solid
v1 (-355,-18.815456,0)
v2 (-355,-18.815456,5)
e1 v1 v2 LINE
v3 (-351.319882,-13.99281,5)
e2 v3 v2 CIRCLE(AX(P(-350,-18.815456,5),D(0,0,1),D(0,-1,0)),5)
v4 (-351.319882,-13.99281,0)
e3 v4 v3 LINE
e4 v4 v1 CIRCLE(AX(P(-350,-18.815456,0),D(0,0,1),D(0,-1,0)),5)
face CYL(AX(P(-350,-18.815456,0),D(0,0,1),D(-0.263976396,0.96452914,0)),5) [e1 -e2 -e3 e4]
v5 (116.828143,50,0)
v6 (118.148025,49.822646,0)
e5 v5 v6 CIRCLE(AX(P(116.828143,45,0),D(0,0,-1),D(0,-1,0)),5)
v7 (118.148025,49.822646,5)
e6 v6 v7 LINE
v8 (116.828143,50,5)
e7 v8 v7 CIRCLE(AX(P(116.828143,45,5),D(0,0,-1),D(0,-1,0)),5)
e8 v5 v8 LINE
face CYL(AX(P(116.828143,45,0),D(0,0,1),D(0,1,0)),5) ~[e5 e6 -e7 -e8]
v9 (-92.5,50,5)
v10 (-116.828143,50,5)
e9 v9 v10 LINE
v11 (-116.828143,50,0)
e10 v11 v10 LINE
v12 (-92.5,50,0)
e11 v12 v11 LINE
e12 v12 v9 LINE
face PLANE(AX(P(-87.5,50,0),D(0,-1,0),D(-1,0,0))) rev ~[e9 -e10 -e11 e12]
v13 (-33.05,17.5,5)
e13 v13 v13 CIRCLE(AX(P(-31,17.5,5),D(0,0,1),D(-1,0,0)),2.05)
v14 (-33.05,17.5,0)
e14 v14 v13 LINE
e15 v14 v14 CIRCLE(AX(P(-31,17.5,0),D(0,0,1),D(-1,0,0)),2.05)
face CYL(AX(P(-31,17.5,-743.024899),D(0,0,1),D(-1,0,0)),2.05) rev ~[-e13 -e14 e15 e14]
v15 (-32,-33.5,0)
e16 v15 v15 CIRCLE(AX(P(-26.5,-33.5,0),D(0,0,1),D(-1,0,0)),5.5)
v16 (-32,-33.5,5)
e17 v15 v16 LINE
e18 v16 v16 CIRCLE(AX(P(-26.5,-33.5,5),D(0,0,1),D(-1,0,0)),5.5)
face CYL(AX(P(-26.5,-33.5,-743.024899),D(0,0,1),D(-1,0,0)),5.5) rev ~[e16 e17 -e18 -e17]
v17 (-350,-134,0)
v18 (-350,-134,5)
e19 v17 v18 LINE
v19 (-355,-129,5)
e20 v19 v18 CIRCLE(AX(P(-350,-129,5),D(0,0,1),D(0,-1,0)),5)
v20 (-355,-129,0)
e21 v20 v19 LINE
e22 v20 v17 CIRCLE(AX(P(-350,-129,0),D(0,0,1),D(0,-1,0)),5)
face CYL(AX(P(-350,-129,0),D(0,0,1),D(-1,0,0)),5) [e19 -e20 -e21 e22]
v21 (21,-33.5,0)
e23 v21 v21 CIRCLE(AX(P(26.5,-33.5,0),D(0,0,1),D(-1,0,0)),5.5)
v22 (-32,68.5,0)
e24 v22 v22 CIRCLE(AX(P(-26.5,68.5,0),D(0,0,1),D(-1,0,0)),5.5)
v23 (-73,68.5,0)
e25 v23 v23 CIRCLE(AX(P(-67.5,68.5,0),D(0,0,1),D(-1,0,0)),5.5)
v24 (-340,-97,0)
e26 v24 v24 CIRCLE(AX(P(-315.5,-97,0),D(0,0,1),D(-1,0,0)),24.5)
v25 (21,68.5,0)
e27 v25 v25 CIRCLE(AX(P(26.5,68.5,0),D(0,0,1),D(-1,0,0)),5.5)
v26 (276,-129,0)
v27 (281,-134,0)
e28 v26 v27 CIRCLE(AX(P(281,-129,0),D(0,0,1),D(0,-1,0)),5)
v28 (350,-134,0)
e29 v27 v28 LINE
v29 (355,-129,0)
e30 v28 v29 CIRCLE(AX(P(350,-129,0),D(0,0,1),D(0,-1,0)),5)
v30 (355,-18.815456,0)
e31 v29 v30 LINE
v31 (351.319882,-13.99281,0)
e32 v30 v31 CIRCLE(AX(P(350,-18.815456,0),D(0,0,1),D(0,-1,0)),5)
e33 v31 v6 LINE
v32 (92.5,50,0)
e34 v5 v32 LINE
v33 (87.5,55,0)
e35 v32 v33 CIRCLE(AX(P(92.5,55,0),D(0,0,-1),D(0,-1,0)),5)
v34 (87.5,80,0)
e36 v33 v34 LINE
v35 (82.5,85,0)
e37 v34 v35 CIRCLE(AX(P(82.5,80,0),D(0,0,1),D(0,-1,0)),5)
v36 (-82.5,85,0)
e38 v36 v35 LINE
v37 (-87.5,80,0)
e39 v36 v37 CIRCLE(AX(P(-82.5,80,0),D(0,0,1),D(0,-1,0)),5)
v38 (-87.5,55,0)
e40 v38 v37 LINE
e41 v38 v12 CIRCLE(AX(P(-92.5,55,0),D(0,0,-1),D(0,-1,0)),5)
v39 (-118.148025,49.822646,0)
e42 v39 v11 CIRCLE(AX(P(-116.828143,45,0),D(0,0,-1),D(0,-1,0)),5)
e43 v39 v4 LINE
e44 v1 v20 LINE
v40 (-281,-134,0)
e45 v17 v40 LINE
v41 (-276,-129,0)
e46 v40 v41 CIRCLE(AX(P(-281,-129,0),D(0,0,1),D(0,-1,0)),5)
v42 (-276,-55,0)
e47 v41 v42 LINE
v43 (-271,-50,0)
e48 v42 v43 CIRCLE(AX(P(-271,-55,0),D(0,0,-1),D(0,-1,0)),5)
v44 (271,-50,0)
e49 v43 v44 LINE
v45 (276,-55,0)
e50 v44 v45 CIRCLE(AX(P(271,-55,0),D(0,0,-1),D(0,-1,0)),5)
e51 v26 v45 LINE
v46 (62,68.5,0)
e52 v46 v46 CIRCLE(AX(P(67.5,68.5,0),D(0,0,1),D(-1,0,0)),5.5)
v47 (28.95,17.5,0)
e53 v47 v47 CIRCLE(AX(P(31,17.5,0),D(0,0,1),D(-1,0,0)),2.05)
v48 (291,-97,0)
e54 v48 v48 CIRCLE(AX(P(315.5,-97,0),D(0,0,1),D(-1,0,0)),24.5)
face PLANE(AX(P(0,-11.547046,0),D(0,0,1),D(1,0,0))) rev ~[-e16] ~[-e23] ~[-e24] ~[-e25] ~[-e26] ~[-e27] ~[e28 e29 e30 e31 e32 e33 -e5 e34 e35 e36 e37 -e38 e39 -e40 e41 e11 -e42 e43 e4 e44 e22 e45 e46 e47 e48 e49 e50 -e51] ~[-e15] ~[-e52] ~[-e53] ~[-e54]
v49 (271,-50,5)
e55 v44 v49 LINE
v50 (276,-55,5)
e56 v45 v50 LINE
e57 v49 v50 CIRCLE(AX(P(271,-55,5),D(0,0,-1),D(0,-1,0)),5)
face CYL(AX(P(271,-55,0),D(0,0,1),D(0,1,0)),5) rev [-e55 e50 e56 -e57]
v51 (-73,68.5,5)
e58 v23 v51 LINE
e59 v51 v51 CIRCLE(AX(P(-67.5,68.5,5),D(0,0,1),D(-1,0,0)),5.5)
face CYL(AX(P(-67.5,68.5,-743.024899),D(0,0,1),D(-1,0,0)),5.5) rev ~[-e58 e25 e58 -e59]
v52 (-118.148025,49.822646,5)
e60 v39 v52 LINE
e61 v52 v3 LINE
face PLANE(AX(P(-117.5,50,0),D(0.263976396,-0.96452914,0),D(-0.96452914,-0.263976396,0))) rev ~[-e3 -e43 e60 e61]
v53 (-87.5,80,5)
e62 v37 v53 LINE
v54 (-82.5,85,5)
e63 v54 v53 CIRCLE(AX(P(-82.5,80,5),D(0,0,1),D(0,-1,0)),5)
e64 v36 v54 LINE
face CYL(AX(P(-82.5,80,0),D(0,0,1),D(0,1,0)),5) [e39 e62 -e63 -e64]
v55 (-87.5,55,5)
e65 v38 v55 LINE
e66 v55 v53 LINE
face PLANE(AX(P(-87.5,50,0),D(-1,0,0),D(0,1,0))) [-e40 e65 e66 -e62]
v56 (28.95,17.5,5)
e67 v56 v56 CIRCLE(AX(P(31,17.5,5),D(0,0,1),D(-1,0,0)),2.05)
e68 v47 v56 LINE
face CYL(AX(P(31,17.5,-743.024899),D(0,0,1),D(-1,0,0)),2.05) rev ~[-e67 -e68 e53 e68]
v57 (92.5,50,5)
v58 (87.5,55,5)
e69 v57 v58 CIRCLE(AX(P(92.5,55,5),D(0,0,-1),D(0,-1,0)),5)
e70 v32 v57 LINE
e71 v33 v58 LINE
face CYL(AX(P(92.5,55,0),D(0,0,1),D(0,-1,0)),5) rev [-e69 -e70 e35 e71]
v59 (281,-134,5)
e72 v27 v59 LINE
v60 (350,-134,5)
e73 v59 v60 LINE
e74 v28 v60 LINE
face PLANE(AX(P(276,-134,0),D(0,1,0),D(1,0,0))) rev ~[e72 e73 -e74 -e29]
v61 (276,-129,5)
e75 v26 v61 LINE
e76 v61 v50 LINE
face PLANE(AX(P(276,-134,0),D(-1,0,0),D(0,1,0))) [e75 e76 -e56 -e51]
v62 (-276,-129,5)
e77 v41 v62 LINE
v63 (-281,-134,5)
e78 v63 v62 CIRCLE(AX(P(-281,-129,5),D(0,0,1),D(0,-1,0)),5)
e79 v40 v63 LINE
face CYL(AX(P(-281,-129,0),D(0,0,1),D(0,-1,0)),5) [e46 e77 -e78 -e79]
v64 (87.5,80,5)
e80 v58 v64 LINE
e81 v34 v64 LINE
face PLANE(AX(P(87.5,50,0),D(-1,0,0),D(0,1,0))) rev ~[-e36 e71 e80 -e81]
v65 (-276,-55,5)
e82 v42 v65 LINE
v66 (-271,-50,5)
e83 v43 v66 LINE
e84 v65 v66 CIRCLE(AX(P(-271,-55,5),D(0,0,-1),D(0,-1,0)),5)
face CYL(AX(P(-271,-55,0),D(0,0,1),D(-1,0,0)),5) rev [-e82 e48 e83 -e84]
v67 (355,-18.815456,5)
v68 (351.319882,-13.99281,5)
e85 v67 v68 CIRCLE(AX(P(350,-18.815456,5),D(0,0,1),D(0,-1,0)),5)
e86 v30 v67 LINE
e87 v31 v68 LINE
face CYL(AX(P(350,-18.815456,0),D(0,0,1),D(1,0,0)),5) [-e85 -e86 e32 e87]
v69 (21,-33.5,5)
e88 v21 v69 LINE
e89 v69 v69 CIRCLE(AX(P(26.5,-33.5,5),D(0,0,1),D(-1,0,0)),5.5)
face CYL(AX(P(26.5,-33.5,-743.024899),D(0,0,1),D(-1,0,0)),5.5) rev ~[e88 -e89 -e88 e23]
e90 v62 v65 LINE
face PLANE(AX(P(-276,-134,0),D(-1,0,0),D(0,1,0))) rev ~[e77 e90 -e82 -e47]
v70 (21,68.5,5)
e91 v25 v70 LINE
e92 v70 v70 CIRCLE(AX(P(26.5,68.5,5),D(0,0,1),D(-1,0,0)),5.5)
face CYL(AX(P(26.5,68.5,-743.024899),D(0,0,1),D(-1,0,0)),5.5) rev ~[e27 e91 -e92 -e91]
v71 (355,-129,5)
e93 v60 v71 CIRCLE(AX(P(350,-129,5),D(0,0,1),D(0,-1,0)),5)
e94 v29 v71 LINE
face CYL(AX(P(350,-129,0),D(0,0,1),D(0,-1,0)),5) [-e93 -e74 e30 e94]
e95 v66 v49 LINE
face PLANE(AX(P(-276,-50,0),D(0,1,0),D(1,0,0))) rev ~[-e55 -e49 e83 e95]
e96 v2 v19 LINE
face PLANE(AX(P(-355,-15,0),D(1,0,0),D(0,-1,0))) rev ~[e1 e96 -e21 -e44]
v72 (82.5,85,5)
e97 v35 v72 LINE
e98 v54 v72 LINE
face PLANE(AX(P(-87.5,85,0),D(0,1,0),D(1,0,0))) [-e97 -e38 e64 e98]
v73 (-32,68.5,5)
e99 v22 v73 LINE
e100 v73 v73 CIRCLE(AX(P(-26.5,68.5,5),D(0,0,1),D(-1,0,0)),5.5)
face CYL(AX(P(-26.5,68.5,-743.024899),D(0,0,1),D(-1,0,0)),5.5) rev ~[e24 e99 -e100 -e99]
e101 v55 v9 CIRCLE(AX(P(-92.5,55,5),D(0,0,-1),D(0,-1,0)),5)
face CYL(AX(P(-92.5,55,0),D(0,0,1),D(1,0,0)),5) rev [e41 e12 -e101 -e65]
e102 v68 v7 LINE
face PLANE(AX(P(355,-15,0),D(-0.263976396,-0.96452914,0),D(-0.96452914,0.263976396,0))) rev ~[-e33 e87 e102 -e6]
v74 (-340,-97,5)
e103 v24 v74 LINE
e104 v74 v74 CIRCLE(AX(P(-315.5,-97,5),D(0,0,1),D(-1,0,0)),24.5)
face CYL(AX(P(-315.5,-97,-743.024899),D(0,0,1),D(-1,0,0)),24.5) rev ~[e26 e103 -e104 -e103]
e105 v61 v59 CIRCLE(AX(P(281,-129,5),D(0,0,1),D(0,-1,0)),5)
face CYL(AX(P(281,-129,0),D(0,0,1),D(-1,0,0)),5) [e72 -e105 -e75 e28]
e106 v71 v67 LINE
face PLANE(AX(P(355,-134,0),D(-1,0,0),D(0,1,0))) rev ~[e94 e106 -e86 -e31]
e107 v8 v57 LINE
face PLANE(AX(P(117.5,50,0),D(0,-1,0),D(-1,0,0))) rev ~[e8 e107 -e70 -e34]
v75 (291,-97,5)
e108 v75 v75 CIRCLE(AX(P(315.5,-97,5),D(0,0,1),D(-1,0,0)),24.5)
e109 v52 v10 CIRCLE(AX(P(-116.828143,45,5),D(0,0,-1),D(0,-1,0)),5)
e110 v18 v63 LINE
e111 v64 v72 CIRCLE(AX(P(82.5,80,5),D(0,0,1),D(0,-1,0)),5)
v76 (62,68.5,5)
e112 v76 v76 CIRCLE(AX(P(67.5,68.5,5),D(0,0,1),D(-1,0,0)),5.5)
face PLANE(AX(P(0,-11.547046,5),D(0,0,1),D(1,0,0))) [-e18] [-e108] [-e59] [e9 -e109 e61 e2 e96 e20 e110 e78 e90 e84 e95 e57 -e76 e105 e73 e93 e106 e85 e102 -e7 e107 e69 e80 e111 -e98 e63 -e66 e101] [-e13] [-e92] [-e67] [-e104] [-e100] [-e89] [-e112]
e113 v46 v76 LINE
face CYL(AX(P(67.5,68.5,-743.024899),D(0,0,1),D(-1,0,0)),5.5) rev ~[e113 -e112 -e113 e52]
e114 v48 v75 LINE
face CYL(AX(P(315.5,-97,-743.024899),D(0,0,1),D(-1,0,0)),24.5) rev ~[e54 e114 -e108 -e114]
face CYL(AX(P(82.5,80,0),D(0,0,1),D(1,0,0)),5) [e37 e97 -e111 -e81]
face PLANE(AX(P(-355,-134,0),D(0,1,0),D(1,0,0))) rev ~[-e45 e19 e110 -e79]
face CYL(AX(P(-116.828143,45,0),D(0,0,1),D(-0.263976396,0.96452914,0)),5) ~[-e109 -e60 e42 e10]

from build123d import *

# Parameters (mm, degrees)
F0_W     = 79
F0_H     = 84
F0_W_2   = 175
F0_H_2   = 35
F1_DEPTH = 5
F2_R     = 5
F3_R     = 5
F6_D     = 4.1
F8_D     = 49
F9_D     = 11


# Not quite as in the source:
# - a feature names something its author has since deleted; it is built from what else it names


with BuildPart() as f1:
    # F0 (on Top) → F1 (new body)
    with BuildSketch(Plane.XY):
        Polygon((-87.5, 50), (-117.5, 50), (-355, -15), (-355, -50), (-276, -50), (276, -50), (355, -50), (355, -15), (117.5, 50), (87.5, 50), align=None)
        with Locations((-315.5, -92)):
            Rectangle(F0_W, F0_H)
        with Locations((315.5, -92)):
            Rectangle(F0_W, F0_H)
        with Locations((0, 67.5)):
            Rectangle(F0_W_2, F0_H_2)
    extrude(amount=F1_DEPTH)

    # F2
    f2_edges = [f1.edges().sort_by_distance(p)[0] for p in [
        (-355, -134, 2.5),
        (-276, -134, 2.5),
        (276, -134, 2.5),
        (355, -134, 2.5),
        (355, -15, 2.5),
        (-355, -15, 2.5),
        (-276, -50, 2.5),
        (276, -50, 2.5),
        (-87.5, 50, 2.5),
        (-87.5, 85, 2.5),
        (87.5, 85, 2.5),
        (87.5, 50, 2.5),
    ]]
    fillet(f2_edges, radius=F2_R)

    # F3
    f3_edges = [f1.edges().sort_by_distance(p)[0] for p in [
        (117.5, 50, 2.5),
        (-117.5, 50, 2.5),
    ]]
    fillet(f3_edges, radius=F3_R)

    # F6 (through all)
    with Locations(Plane(origin=(0, 0, 0), x_dir=(1, 0, 0), z_dir=(0, 0, -1))):
        with Locations((-31, -17.5), (31, -17.5)):
            Hole(F6_D / 2)

    # F8 (through all)
    with Locations(Plane(origin=(0, 0, 0), x_dir=(1, 0, 0), z_dir=(0, 0, -1))):
        with Locations((-315.5, 97), (315.5, 97)):
            Hole(F8_D / 2)

    # F9 (through all)
    with Locations(Plane(origin=(0, 0, 0), x_dir=(1, 0, 0), z_dir=(0, 0, -1))):
        with Locations((-67.5, -68.5), (67.5, -68.5), (-26.5, -68.5), (26.5, -68.5), (-26.5, 33.5), (26.5, 33.5)):
            Hole(F9_D / 2)


solid = f1.part
